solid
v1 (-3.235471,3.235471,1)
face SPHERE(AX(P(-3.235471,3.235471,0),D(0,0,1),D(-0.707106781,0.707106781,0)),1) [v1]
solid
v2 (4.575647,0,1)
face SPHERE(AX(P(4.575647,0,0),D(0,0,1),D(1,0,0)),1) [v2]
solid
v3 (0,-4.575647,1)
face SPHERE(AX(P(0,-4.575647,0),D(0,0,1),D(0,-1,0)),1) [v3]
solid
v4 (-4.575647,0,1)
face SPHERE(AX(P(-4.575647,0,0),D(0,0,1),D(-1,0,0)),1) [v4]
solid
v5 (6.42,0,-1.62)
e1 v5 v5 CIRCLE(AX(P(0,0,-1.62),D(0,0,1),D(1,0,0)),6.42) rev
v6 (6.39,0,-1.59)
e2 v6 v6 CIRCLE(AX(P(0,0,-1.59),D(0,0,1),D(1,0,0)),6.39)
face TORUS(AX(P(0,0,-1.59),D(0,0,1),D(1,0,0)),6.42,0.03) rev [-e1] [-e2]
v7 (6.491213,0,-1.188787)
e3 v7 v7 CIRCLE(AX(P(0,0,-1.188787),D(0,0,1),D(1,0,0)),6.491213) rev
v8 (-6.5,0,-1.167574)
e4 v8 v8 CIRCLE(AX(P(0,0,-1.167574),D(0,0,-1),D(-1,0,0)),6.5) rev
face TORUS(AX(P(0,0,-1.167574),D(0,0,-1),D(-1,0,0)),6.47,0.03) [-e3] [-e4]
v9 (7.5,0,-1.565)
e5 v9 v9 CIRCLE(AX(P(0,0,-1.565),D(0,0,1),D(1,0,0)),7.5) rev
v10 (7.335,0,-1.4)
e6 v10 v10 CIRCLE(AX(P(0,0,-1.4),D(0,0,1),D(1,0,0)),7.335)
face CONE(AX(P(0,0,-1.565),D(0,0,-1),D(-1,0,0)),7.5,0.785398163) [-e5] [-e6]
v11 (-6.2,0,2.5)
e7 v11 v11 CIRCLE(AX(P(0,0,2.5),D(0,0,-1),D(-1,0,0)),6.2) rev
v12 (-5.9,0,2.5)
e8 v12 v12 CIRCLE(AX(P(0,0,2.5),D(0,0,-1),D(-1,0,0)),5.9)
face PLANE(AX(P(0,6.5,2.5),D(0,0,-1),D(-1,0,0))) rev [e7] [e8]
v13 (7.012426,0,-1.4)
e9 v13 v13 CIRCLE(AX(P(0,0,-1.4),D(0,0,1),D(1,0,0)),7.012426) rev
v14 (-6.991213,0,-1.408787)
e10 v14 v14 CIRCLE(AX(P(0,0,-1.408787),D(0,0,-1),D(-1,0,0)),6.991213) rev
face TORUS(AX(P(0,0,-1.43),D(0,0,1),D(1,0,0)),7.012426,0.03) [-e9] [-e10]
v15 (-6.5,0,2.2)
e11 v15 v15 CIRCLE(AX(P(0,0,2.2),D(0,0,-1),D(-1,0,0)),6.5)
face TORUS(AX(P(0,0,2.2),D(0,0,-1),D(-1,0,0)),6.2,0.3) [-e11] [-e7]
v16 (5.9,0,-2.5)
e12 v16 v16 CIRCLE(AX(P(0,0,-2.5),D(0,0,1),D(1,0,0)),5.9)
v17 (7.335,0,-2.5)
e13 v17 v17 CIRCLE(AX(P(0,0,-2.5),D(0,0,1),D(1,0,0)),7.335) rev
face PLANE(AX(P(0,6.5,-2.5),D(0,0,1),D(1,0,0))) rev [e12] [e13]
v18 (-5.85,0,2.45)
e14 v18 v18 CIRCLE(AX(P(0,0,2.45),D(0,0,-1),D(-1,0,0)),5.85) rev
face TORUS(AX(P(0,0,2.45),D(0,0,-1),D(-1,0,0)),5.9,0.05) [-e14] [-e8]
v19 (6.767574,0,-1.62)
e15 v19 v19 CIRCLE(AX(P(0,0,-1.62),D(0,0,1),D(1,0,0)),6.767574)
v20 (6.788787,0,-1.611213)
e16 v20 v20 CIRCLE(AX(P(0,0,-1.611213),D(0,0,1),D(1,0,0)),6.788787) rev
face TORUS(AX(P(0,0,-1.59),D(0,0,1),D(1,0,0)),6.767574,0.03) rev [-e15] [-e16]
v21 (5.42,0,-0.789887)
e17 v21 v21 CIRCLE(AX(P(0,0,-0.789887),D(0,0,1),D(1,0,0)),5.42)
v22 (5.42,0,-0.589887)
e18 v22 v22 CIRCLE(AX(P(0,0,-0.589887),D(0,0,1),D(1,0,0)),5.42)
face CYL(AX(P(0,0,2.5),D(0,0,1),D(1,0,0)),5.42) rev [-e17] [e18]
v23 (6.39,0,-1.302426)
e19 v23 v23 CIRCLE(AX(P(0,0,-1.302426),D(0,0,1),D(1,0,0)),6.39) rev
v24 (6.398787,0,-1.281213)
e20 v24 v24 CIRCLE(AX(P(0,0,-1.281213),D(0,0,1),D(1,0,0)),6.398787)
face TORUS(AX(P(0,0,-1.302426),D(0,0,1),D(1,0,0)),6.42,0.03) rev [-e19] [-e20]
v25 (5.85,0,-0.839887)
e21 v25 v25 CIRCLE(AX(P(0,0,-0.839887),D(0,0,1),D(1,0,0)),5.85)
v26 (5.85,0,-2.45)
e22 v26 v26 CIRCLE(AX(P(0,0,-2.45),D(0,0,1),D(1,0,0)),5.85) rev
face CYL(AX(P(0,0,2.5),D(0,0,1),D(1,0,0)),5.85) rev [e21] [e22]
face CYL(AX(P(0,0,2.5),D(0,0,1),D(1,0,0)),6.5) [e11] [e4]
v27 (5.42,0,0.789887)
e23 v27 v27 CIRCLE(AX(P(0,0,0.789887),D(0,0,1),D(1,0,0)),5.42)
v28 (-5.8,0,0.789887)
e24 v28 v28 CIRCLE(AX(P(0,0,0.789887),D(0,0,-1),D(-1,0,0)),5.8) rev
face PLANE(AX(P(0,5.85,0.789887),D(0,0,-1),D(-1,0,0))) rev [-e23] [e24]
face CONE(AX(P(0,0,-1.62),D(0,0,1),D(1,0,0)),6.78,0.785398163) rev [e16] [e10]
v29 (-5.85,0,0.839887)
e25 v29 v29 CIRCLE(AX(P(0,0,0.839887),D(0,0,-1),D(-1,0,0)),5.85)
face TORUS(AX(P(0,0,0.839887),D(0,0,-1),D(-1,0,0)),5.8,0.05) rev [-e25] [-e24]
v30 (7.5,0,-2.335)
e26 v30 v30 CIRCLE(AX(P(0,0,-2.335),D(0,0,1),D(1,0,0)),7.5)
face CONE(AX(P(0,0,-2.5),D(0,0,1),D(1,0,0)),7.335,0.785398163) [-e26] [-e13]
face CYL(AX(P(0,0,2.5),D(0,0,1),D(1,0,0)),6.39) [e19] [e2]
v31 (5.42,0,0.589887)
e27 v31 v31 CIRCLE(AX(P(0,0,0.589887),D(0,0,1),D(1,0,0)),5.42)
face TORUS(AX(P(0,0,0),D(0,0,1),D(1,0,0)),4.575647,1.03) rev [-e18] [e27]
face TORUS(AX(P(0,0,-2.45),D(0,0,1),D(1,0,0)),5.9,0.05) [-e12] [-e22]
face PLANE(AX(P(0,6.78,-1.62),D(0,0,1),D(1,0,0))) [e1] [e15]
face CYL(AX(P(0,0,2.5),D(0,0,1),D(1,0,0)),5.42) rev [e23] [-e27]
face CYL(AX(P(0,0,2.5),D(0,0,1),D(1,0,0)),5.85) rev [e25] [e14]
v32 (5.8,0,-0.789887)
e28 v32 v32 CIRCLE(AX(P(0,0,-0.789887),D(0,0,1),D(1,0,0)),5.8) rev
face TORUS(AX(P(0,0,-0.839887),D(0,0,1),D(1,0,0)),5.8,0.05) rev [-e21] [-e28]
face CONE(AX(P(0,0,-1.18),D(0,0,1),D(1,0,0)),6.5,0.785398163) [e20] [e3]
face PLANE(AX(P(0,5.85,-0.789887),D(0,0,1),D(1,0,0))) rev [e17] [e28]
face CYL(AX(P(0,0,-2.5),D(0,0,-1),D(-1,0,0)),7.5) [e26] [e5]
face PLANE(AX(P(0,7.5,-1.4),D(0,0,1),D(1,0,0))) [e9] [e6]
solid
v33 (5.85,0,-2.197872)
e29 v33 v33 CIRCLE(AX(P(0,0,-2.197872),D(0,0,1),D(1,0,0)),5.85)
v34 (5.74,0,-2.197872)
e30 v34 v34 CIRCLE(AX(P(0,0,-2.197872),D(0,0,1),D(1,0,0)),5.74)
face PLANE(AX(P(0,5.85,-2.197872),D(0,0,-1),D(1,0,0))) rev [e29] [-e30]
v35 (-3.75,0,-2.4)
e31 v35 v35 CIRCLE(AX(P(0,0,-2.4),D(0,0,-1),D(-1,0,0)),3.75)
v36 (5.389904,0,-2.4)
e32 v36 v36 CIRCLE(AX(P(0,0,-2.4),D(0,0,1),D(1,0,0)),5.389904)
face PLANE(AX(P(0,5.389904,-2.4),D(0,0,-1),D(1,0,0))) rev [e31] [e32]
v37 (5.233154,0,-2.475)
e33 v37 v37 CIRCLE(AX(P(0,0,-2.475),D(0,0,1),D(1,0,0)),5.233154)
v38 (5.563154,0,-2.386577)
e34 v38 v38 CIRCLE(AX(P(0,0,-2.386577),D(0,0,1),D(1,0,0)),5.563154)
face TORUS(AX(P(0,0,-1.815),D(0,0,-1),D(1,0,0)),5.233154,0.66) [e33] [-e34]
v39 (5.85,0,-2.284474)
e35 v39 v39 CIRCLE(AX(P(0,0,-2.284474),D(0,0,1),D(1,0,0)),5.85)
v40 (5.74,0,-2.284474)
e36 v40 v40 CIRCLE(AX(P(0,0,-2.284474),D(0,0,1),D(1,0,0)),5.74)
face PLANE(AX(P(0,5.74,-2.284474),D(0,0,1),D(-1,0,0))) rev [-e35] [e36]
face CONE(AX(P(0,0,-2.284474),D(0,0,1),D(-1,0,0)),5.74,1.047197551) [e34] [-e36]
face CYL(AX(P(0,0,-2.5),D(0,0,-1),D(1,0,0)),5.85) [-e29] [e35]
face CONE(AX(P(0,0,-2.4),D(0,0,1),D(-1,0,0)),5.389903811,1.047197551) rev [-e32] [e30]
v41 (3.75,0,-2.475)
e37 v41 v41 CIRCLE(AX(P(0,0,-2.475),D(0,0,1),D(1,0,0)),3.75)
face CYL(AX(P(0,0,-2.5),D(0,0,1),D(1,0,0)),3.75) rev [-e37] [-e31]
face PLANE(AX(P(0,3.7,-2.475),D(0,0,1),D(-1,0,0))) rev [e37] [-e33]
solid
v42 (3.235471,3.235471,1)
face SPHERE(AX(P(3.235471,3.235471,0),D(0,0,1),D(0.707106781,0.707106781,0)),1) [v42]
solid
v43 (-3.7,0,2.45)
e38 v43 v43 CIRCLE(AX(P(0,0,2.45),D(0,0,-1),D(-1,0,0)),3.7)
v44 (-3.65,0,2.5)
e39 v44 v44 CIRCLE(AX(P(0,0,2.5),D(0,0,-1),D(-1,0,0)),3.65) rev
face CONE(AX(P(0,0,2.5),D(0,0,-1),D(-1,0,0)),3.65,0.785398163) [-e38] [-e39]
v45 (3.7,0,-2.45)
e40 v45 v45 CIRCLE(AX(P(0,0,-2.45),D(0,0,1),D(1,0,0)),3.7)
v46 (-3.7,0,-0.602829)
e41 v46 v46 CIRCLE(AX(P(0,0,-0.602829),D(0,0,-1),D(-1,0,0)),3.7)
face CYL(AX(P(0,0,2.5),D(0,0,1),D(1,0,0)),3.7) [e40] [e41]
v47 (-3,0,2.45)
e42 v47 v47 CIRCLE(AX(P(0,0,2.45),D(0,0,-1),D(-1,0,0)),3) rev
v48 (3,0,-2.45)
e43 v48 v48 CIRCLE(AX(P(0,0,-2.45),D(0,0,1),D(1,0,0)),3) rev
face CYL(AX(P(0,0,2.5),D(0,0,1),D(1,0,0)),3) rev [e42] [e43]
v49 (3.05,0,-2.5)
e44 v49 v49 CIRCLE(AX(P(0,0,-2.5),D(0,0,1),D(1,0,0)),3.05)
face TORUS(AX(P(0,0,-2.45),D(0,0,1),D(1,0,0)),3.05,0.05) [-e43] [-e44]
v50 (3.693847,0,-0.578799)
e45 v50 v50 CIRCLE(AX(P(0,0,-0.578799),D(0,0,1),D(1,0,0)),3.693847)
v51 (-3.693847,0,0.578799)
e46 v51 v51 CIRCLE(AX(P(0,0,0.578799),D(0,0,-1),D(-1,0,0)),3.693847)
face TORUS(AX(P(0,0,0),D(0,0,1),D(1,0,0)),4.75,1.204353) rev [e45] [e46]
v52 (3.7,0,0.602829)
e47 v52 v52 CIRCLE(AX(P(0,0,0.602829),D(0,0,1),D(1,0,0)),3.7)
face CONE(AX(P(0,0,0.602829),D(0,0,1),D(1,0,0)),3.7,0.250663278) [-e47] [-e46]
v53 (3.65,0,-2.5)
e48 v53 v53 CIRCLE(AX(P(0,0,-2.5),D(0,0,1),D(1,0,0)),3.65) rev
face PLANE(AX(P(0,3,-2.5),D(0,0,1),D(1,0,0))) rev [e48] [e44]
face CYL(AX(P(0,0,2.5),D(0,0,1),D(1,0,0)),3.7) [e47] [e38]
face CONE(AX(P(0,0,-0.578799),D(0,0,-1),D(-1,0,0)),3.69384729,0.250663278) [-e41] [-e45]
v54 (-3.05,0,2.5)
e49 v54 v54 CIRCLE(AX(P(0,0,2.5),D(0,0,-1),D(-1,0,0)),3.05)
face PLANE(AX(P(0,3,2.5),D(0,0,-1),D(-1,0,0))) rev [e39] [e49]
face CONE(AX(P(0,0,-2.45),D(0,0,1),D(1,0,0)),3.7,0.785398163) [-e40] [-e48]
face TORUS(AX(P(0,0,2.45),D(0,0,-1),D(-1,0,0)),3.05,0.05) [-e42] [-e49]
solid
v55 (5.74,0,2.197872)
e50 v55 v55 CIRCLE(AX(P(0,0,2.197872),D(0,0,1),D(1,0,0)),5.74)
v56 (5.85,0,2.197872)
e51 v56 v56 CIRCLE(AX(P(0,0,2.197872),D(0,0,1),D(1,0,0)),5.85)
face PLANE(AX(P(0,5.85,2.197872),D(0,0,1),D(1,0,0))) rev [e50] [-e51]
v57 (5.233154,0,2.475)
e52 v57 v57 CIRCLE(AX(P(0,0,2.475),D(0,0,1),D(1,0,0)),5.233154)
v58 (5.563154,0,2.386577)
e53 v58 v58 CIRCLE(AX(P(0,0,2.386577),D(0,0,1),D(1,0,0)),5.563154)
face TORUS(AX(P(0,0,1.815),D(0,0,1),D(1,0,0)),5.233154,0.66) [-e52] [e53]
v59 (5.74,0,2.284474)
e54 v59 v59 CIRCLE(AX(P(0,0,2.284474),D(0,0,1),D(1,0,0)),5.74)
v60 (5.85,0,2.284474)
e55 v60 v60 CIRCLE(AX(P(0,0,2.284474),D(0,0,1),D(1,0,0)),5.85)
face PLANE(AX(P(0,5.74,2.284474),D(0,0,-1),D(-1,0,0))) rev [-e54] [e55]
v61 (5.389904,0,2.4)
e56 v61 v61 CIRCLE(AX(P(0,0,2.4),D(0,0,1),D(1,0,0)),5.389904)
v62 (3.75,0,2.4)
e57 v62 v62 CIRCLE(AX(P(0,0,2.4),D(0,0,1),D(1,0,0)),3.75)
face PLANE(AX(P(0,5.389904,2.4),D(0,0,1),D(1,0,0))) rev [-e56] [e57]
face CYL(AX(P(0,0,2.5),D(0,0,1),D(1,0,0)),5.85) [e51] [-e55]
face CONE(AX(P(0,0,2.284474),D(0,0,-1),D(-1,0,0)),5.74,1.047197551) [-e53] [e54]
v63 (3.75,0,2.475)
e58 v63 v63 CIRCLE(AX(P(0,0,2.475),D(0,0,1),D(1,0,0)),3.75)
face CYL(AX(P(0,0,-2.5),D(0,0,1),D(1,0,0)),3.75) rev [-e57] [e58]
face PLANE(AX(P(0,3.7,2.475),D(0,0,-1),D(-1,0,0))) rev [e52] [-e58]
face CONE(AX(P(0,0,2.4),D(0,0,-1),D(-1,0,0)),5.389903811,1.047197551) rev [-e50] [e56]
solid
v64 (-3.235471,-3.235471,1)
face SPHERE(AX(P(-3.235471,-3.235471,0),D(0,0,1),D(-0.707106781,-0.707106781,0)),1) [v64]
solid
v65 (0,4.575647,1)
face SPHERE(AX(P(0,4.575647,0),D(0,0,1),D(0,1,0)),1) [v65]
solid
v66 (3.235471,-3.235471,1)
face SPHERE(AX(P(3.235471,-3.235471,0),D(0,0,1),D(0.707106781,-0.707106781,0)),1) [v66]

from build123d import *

# Parameters (mm, degrees)
CIRPATTERN1_COUNT  = 8
SKETCH9_R          = 3.75
CUT_EXTRUDE1_DEPTH = 11.452302378
SKETCH7_W          = 1.1
SKETCH7_H          = 1.65
FILLET2_R          = 0.3
FILLET3_R          = 0.05
FILLET5_R          = 0.03
CHAMFER1_SIZE      = 0.165
FILLET7_R          = 0.05


with BuildPart() as part:
    # Sketch3 → Revolve1 (revolve)
    with BuildSketch(Plane(origin=(0, 0, 0), x_dir=(0, 0, -1), z_dir=(1, 0, 0)), mode=Mode.PRIVATE) as revolve1_sk:
        with BuildLine():
            Line((-2.5, 6.5), (-2.5, 5.85))
            Line((-2.5, 5.85), (-0.789887484, 5.85))
            Line((-0.789887484, 5.85), (-0.789887484, 5.42))
            Line((-0.789887484, 5.42), (-0.589887484, 5.42))
            ThreePointArc((-0.589887484, 5.42), (0, 5.605646545), (0.589887484, 5.42))
            Line((0.589887484, 5.42), (0.789887484, 5.42))
            Line((0.789887484, 5.42), (0.789887484, 5.85))
            Line((0.789887484, 5.85), (2.5, 5.85))
            Line((2.5, 5.85), (2.5, 6.5))
            Line((2.5, 6.5), (-2.5, 6.5))
        make_face()
        with BuildLine():
            Line((2.5, 3), (-2.5, 3))
            Line((-2.5, 3), (-2.5, 3.7))
            Line((-2.5, 3.7), (-0.589887484, 3.7))
            ThreePointArc((-0.589887484, 3.7), (0, 3.545646545), (0.589887484, 3.7))
            Line((0.589887484, 3.7), (2.5, 3.7))
            Line((2.5, 3.7), (2.5, 3))
        make_face()
    revolve(revolve1_sk.sketch.rotate(Axis((0, 0, 2.5), (0, 0, -1)), 90), axis=Axis((0, 0, 2.5), (0, 0, -1)))

    # Sketch7 → Revolve5 (revolve)
    with BuildSketch(Plane(origin=(0, 0, 0), x_dir=(0, 0, -1), z_dir=(1, 0, 0)), mode=Mode.PRIVATE) as revolve5_sk:
        with Locations((1.95, 6.675)):
            Rectangle(SKETCH7_W, SKETCH7_H)
    revolve(revolve5_sk.sketch.rotate(Axis((0, 0, -2.5), (0, 0, 1)), 270), axis=Axis((0, 0, -2.5), (0, 0, 1)))

    # Fillet2
    fillet2_edges = [part.edges().sort_by_distance(p)[0] for p in [
        (-6.5, 0, 2.5),
    ]]
    fillet(fillet2_edges, radius=FILLET2_R)

    # Fillet3
    fillet3_edges = [part.edges().sort_by_distance(p)[0] for p in [
        (-5.85, 0, 0.789887484),
        (-5.85, 0, 2.5),
        (-5.85, 0, -2.5),
        (-5.85, 0, -0.789887484),
    ]]
    fillet(fillet3_edges, radius=FILLET3_R)

    # Fillet6
    # the kernel refuses this chamfer: 0.05 mm, written as the material it takes off along each edge
    with BuildSketch(Plane(origin=(0, 0, 2.5), x_dir=(1, 0, 0), z_dir=(0, 1, 0))) as fillet6_piece_1:
        with BuildLine():
            Line((3.648585786, -0.001414214), (3.701414214, 0.051414214))
            Line((3.701414214, 0.051414214), (3.702414214, 0.051414214))
            ThreePointArc((3.702414214, 0.051414214), (3.701, 0.025707107), (3.701, 0))
            Line((3.701, 0), (3.7, -0.001))
            ThreePointArc((3.7, -0.001), (3.674292893, -0.001), (3.648585786, -0.002414214))
            Line((3.648585786, -0.002414214), (3.648585786, -0.001414214))
        make_face()
    revolve(axis=Axis((0, 0, 2.5), (0, 0, -1)), mode=Mode.SUBTRACT)
    with BuildSketch(Plane(origin=(0, 0, 0.589887484), x_dir=(1, 0, 0), z_dir=(0, 1, 0))) as fillet6_piece_2:
        with BuildLine():
            Line((3.700496093, -0.014878835), (3.693351197, 0.013025622))
            Line((3.693351197, 0.013025622), (3.694228143, 0.013506211))
            ThreePointArc((3.694228143, 0.013506211), (3.697314684, 0.006866763), (3.700871837, 0.000489796))
            Line((3.700871837, 0.000489796), (3.701, 0))
            ThreePointArc((3.701, 0), (3.701, -0.007439417), (3.701496093, -0.014878835))
            Line((3.701496093, -0.014878835), (3.700496093, -0.014878835))
        make_face()
    revolve(axis=Axis((0, 0, 0.589887484), (0, 0, -1)), mode=Mode.SUBTRACT)
    with BuildSketch(Plane(origin=(0, 0, -0.589887484), x_dir=(1, 0, 0), z_dir=(0, 1, 0))) as fillet6_piece_3:
        with BuildLine():
            Line((3.700496093, 0.014878835), (3.693351197, -0.013025622))
            Line((3.693351197, -0.013025622), (3.694228143, -0.013506211))
            ThreePointArc((3.694228143, -0.013506211), (3.697314684, -0.006866763), (3.700871837, -0.000489796))
            Line((3.700871837, -0.000489796), (3.701, 0))
            ThreePointArc((3.701, 0), (3.701, 0.007439417), (3.701496093, 0.014878835))
            Line((3.701496093, 0.014878835), (3.700496093, 0.014878835))
        make_face()
    revolve(axis=Axis((0, 0, -0.589887484), (0, 0, -1)), mode=Mode.SUBTRACT)
    with BuildSketch(Plane(origin=(0, 0, -2.5), x_dir=(1, 0, 0), z_dir=(0, 1, 0))) as fillet6_piece_4:
        with BuildLine():
            Line((3.701414214, -0.051414214), (3.648585786, 0.001414214))
            Line((3.648585786, 0.001414214), (3.648585786, 0.002414214))
            ThreePointArc((3.648585786, 0.002414214), (3.674292893, 0.001), (3.7, 0.001))
            Line((3.7, 0.001), (3.701, 0))
            ThreePointArc((3.701, 0), (3.701, -0.025707107), (3.702414214, -0.051414214))
            Line((3.702414214, -0.051414214), (3.701414214, -0.051414214))
        make_face()
    revolve(axis=Axis((0, 0, -2.5), (0, 0, -1)), mode=Mode.SUBTRACT)

    # Sketch8 → Cut-Revolve1 (revolve, cut)
    with BuildSketch(Plane(origin=(0, 0, 0), x_dir=(0, 0, -1), z_dir=(1, 0, 0)), mode=Mode.PRIVATE) as cut_revolve1_sk:
        Polygon((1.4, 7), (1.62, 6.78), (1.62, 6.39), (1.29, 6.39), (1.18, 6.5), (1.4, 6.5), align=None)
    revolve(cut_revolve1_sk.sketch.rotate(Axis((0, 0, 2.5), (0, 0, -1)), 270), axis=Axis((0, 0, 2.5), (0, 0, -1)), mode=Mode.SUBTRACT)

    # Fillet5
    fillet5_edges = [part.edges().sort_by_distance(p)[0] for p in [
        (7, 0, -1.4),
        (0, 6.5, -1.18),
        (6.39, 0, -1.29),
        (6.39, 0, -1.62),
        (6.78, 0, -1.62),
    ]]
    fillet(fillet5_edges, radius=FILLET5_R)

    # Chamfer1
    chamfer1_edges = [part.edges().sort_by_distance(p)[0] for p in [
        (-7.5, 0, -2.5),
        (-7.5, 0, -1.4),
    ]]
    chamfer(chamfer1_edges, length=CHAMFER1_SIZE)

    # Fillet7
    fillet7_edges = [part.edges().sort_by_distance(p)[0] for p in [
        (-3, 0, -2.5),
        (-3, 0, 2.5),
    ]]
    fillet(fillet7_edges, radius=FILLET7_R)


with BuildPart() as body_2:
    # Sketch5 → Revolve3 (revolve)
    with BuildSketch(Plane(origin=(0, 0, 0), x_dir=(0, 0, -1), z_dir=(1, 0, 0))):
        with BuildLine():
            Line((-1, 4.575646545), (1, 4.575646545))
            ThreePointArc((1, 4.575646545), (0, 5.575646545), (-1, 4.575646545))
        make_face()
    revolve(axis=Axis((0, 4.575646545, 1), (0, 0, -1)))


with BuildPart() as cirpattern1_1:
    # CirPattern1: pattern copy
    add(body_2.part.rotate(Axis((0, 0, 0), (0, 0, 1)), 1 * 360 / CIRPATTERN1_COUNT))


with BuildPart() as cirpattern1_2:
    # CirPattern1: pattern copy
    add(body_2.part.rotate(Axis((0, 0, 0), (0, 0, 1)), 2 * 360 / CIRPATTERN1_COUNT))


with BuildPart() as cirpattern1_3:
    # CirPattern1: pattern copy
    add(body_2.part.rotate(Axis((0, 0, 0), (0, 0, 1)), 3 * 360 / CIRPATTERN1_COUNT))


with BuildPart() as cirpattern1_4:
    # CirPattern1: pattern copy
    add(body_2.part.rotate(Axis((0, 0, 0), (0, 0, 1)), 4 * 360 / CIRPATTERN1_COUNT))


with BuildPart() as cirpattern1_5:
    # CirPattern1: pattern copy
    add(body_2.part.rotate(Axis((0, 0, 0), (0, 0, 1)), 5 * 360 / CIRPATTERN1_COUNT))


with BuildPart() as cirpattern1_6:
    # CirPattern1: pattern copy
    add(body_2.part.rotate(Axis((0, 0, 0), (0, 0, 1)), 6 * 360 / CIRPATTERN1_COUNT))


with BuildPart() as cirpattern1_7:
    # CirPattern1: pattern copy
    add(body_2.part.rotate(Axis((0, 0, 0), (0, 0, 1)), 7 * 360 / CIRPATTERN1_COUNT))


with BuildPart() as body_10:
    # Sketch6 → Revolve4 (revolve)
    with BuildSketch(Plane(origin=(0, 0, 0), x_dir=(0, 0, -1), z_dir=(1, 0, 0)), mode=Mode.PRIVATE) as revolve4_sk:
        with BuildLine():
            Line((-2.475, 3.7), (-2.475, 5.233153533))
            ThreePointArc((-2.475, 5.233153533), (-2.452511045, 5.403974103), (-2.386576766, 5.563153533))
            Line((-2.386576766, 5.563153533), (-2.284474411, 5.74))
            Line((-2.284474411, 5.74), (-2.284474411, 5.85))
            Line((-2.284474411, 5.85), (-2.197871871, 5.85))
            Line((-2.197871871, 5.85), (-2.197871871, 5.74))
            Line((-2.197871871, 5.74), (-2.4, 5.389903811))
            Line((-2.4, 5.389903811), (-2.4, 3.7))
            Line((-2.4, 3.7), (-2.475, 3.7))
        make_face()
    revolve(revolve4_sk.sketch.rotate(Axis((0, 0, 2.5), (0, 0, -1)), 90), axis=Axis((0, 0, 2.5), (0, 0, -1)))


with BuildPart() as body_11:
    # Mirror1: mirrored copy
    add(body_10.part.mirror(Plane.XY))


with BuildPart() as cut_extrude1_tool:
    # Sketch9 → Cut-Extrude1 (new, through all)
    with BuildSketch(Plane.XY.offset(2.475)):
        Circle(SKETCH9_R)
    extrude(amount=-CUT_EXTRUDE1_DEPTH)


with BuildPart() as body_10_1:
    add(body_10.part)

    # Cut-Extrude1: cut by cut_extrude1_tool
    add(cut_extrude1_tool.part, mode=Mode.SUBTRACT)


with BuildPart() as body_11_1:
    add(body_11.part)

    # Cut-Extrude1: cut by cut_extrude1_tool
    add(cut_extrude1_tool.part, mode=Mode.SUBTRACT)


solid = Compound([part.part, body_2.part, cirpattern1_1.part, cirpattern1_2.part, cirpattern1_3.part, cirpattern1_4.part, cirpattern1_5.part, cirpattern1_6.part, cirpattern1_7.part, body_10_1.part, body_11_1.part])
